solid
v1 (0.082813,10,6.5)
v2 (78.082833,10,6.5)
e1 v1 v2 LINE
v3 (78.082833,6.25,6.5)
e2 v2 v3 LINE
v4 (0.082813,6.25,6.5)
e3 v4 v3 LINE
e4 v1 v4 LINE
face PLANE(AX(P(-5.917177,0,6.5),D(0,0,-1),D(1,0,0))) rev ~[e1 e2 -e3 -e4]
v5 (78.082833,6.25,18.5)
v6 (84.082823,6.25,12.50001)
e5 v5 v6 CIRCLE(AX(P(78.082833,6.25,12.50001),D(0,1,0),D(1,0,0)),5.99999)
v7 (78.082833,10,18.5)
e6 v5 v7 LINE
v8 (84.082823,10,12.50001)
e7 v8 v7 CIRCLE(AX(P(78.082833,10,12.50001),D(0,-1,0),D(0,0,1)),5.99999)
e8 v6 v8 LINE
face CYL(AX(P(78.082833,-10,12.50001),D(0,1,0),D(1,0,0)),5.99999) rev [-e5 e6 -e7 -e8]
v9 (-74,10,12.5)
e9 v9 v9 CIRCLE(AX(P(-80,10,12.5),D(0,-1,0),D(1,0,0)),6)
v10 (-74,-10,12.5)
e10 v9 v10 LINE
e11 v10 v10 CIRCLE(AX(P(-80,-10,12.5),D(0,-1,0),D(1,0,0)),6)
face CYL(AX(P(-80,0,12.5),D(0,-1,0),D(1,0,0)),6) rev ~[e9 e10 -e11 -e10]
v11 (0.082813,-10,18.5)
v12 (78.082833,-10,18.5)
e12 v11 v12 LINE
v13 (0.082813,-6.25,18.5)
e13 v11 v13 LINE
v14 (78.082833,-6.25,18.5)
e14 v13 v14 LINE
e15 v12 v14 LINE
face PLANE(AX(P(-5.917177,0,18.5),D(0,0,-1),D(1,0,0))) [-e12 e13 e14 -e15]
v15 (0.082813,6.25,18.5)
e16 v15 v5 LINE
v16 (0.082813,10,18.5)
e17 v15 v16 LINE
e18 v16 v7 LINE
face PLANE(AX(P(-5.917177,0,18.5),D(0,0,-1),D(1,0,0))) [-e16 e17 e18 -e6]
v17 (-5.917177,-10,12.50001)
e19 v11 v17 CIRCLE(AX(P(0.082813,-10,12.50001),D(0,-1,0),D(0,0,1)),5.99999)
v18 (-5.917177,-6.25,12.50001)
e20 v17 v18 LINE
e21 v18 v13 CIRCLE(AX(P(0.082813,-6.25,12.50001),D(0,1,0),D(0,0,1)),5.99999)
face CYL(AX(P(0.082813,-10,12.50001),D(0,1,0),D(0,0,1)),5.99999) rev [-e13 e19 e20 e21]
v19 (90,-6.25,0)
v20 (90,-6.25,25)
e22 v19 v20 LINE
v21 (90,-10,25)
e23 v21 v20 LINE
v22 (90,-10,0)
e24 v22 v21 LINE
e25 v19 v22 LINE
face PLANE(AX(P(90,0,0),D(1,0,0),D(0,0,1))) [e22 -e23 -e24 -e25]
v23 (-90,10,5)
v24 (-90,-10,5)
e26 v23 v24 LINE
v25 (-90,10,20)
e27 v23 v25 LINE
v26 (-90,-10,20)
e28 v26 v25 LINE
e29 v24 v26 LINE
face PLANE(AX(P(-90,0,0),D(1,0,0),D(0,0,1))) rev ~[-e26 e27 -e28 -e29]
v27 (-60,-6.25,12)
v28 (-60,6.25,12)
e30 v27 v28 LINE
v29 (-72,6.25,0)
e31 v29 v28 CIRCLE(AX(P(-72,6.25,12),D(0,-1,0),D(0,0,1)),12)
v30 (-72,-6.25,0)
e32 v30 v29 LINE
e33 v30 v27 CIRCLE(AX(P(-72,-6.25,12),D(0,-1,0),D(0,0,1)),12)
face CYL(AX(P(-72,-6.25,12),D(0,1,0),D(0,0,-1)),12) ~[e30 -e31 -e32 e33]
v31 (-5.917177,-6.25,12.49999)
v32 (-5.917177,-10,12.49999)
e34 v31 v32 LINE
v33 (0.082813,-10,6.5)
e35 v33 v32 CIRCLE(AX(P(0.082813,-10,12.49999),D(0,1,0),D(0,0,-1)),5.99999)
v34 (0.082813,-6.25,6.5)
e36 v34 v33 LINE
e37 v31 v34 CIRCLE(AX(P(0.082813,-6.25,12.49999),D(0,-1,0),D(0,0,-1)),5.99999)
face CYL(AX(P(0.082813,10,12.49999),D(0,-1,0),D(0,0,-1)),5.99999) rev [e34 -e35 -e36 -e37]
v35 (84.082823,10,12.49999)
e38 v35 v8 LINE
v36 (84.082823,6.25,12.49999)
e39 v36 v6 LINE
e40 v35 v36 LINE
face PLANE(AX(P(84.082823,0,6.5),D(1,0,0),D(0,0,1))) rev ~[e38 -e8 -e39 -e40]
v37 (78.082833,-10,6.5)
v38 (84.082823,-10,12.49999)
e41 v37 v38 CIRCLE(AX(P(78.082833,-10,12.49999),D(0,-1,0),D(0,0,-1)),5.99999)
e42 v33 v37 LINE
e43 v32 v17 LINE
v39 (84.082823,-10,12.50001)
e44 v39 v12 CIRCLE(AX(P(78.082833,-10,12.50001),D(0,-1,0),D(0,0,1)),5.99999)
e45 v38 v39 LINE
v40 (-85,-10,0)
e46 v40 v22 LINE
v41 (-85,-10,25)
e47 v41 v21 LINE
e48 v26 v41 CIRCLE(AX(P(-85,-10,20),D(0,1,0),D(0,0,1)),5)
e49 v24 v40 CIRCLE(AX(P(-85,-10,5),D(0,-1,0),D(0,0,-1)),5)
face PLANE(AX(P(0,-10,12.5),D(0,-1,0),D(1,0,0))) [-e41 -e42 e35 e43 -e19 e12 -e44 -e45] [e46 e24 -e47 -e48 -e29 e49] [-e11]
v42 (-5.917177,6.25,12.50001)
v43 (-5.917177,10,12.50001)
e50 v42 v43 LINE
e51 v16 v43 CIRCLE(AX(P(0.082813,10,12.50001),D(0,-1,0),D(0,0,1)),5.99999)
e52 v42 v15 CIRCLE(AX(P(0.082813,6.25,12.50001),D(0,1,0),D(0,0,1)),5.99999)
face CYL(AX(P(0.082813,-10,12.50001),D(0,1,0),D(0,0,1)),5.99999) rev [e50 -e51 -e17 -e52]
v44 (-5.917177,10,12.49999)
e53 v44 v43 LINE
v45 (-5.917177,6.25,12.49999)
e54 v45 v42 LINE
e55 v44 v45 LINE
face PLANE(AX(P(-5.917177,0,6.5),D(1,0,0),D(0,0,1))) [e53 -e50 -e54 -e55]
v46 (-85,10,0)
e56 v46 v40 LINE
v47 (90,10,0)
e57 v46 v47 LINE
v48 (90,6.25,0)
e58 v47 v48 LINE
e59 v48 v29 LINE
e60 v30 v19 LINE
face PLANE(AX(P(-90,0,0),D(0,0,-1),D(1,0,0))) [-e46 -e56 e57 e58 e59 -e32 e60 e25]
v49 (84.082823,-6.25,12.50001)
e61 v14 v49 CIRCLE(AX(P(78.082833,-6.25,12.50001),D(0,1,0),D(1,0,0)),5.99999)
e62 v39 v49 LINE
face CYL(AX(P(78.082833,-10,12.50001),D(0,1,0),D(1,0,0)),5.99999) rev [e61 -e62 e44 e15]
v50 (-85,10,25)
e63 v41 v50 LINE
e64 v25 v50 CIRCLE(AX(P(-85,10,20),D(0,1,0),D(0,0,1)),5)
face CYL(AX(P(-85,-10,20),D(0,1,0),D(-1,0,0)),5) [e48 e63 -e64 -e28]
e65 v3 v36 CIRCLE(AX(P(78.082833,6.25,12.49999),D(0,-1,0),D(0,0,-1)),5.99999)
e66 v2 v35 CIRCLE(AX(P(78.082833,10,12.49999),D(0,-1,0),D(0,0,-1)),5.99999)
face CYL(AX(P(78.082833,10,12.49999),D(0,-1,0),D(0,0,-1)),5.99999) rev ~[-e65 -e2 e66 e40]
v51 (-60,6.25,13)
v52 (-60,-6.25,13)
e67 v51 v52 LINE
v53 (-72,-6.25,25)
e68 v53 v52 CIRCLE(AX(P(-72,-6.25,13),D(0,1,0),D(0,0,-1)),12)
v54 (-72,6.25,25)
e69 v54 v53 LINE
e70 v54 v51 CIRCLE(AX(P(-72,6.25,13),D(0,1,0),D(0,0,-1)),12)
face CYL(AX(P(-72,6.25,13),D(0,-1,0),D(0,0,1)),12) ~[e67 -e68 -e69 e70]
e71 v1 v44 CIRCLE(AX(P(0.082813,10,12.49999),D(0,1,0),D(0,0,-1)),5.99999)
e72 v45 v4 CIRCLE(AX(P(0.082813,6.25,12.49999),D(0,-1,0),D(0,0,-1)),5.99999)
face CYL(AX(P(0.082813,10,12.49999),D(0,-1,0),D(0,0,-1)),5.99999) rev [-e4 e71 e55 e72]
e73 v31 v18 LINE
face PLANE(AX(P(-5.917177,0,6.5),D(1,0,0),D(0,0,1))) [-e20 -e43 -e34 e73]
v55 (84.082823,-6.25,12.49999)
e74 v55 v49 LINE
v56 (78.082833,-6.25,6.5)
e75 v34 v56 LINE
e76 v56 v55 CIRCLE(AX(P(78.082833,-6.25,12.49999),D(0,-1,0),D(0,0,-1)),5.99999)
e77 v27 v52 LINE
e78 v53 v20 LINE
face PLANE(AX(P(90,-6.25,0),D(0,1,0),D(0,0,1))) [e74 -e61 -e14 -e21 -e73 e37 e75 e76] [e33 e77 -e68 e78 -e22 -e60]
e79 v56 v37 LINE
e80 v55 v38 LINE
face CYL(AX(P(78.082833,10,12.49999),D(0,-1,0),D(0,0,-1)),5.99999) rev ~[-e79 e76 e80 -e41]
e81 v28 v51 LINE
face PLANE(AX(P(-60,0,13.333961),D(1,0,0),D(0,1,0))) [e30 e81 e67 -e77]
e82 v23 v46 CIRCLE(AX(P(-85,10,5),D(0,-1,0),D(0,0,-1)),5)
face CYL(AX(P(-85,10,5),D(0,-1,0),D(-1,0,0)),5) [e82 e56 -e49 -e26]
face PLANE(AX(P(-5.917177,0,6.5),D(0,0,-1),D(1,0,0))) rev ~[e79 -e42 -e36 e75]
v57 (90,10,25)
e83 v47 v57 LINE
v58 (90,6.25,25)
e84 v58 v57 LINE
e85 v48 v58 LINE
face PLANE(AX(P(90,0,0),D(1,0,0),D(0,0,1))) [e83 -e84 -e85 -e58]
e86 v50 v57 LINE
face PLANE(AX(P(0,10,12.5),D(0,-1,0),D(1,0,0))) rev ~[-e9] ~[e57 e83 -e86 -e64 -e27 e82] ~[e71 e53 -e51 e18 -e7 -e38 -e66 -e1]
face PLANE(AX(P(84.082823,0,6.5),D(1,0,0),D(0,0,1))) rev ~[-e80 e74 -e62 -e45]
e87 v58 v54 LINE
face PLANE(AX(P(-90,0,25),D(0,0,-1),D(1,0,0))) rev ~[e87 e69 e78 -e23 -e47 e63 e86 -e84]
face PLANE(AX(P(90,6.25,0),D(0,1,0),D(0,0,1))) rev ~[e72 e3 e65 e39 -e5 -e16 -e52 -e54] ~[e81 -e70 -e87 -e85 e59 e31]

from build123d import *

# Parameters (mm, degrees)
F0_W     = 180
F0_H     = 25
F1_DEPTH = 10
F2_R     = 5
F3_R     = 6
F4_DEPTH = 12.5
F5_W     = 90
F5_H     = 12
F6_DEPTH = 12.5
F7_R     = 5.99999
F8_W     = 12.5
F8_H     = 26.6679223076
F9_DEPTH = 150
F10_R    = 12


# Not quite as in the source:
# - a fillet or chamfer is up to 0.001 mm smaller than in the source, because OpenCascade refuses the exact size


with BuildPart() as f1:
    # F0 (on Front) → F1 (new body, symmetric)
    with BuildSketch(Plane.XZ):
        with Locations((0, 12.5)):
            Rectangle(F0_W, F0_H)
    extrude(amount=F1_DEPTH, both=True)

    # F2
    f2_edges = [f1.edges().sort_by_distance(p)[0] for p in [
        (-90, 0, 25),
        (-90, 0, 0),
    ]]
    fillet(f2_edges, radius=F2_R)

    # F3 (on Front) → F4 (cut, symmetric)
    with BuildSketch(Plane.XZ):
        with Locations((-80, 12.5)):
            Circle(F3_R)
    extrude(amount=F4_DEPTH, both=True, mode=Mode.SUBTRACT)

    # F5 (on Front) → F6 (cut, symmetric)
    with BuildSketch(Plane.XZ):
        with Locations((39.0828225685, 12.5)):
            Rectangle(F5_W, F5_H)
    extrude(amount=F6_DEPTH, both=True, mode=Mode.SUBTRACT)

    # F7 (radius 6 in the source; OpenCascade refuses exactly that, so slightly less here)
    f7_edges = [f1.edges().sort_by_distance(p)[0] for p in [
        (-5.917177, 0, 6.5),
        (-5.917177, 0, 18.5),
        (84.082823, 0, 18.5),
        (84.082823, 0, 6.5),
    ]]
    fillet(f7_edges, radius=F7_R)

    # F8 (on face) → F9 (cut)
    with BuildSketch(Plane.YZ.offset(90)):
        with Locations((0, 13.3339611538)):
            Rectangle(F8_W, F8_H)
    extrude(amount=-F9_DEPTH, mode=Mode.SUBTRACT)

    # F10
    f10_edges = [f1.edges().sort_by_distance(p)[0] for p in [
        (-60, 0, 25),
        (-60, 0, 0),
    ]]
    fillet(f10_edges, radius=F10_R)


solid = f1.part
